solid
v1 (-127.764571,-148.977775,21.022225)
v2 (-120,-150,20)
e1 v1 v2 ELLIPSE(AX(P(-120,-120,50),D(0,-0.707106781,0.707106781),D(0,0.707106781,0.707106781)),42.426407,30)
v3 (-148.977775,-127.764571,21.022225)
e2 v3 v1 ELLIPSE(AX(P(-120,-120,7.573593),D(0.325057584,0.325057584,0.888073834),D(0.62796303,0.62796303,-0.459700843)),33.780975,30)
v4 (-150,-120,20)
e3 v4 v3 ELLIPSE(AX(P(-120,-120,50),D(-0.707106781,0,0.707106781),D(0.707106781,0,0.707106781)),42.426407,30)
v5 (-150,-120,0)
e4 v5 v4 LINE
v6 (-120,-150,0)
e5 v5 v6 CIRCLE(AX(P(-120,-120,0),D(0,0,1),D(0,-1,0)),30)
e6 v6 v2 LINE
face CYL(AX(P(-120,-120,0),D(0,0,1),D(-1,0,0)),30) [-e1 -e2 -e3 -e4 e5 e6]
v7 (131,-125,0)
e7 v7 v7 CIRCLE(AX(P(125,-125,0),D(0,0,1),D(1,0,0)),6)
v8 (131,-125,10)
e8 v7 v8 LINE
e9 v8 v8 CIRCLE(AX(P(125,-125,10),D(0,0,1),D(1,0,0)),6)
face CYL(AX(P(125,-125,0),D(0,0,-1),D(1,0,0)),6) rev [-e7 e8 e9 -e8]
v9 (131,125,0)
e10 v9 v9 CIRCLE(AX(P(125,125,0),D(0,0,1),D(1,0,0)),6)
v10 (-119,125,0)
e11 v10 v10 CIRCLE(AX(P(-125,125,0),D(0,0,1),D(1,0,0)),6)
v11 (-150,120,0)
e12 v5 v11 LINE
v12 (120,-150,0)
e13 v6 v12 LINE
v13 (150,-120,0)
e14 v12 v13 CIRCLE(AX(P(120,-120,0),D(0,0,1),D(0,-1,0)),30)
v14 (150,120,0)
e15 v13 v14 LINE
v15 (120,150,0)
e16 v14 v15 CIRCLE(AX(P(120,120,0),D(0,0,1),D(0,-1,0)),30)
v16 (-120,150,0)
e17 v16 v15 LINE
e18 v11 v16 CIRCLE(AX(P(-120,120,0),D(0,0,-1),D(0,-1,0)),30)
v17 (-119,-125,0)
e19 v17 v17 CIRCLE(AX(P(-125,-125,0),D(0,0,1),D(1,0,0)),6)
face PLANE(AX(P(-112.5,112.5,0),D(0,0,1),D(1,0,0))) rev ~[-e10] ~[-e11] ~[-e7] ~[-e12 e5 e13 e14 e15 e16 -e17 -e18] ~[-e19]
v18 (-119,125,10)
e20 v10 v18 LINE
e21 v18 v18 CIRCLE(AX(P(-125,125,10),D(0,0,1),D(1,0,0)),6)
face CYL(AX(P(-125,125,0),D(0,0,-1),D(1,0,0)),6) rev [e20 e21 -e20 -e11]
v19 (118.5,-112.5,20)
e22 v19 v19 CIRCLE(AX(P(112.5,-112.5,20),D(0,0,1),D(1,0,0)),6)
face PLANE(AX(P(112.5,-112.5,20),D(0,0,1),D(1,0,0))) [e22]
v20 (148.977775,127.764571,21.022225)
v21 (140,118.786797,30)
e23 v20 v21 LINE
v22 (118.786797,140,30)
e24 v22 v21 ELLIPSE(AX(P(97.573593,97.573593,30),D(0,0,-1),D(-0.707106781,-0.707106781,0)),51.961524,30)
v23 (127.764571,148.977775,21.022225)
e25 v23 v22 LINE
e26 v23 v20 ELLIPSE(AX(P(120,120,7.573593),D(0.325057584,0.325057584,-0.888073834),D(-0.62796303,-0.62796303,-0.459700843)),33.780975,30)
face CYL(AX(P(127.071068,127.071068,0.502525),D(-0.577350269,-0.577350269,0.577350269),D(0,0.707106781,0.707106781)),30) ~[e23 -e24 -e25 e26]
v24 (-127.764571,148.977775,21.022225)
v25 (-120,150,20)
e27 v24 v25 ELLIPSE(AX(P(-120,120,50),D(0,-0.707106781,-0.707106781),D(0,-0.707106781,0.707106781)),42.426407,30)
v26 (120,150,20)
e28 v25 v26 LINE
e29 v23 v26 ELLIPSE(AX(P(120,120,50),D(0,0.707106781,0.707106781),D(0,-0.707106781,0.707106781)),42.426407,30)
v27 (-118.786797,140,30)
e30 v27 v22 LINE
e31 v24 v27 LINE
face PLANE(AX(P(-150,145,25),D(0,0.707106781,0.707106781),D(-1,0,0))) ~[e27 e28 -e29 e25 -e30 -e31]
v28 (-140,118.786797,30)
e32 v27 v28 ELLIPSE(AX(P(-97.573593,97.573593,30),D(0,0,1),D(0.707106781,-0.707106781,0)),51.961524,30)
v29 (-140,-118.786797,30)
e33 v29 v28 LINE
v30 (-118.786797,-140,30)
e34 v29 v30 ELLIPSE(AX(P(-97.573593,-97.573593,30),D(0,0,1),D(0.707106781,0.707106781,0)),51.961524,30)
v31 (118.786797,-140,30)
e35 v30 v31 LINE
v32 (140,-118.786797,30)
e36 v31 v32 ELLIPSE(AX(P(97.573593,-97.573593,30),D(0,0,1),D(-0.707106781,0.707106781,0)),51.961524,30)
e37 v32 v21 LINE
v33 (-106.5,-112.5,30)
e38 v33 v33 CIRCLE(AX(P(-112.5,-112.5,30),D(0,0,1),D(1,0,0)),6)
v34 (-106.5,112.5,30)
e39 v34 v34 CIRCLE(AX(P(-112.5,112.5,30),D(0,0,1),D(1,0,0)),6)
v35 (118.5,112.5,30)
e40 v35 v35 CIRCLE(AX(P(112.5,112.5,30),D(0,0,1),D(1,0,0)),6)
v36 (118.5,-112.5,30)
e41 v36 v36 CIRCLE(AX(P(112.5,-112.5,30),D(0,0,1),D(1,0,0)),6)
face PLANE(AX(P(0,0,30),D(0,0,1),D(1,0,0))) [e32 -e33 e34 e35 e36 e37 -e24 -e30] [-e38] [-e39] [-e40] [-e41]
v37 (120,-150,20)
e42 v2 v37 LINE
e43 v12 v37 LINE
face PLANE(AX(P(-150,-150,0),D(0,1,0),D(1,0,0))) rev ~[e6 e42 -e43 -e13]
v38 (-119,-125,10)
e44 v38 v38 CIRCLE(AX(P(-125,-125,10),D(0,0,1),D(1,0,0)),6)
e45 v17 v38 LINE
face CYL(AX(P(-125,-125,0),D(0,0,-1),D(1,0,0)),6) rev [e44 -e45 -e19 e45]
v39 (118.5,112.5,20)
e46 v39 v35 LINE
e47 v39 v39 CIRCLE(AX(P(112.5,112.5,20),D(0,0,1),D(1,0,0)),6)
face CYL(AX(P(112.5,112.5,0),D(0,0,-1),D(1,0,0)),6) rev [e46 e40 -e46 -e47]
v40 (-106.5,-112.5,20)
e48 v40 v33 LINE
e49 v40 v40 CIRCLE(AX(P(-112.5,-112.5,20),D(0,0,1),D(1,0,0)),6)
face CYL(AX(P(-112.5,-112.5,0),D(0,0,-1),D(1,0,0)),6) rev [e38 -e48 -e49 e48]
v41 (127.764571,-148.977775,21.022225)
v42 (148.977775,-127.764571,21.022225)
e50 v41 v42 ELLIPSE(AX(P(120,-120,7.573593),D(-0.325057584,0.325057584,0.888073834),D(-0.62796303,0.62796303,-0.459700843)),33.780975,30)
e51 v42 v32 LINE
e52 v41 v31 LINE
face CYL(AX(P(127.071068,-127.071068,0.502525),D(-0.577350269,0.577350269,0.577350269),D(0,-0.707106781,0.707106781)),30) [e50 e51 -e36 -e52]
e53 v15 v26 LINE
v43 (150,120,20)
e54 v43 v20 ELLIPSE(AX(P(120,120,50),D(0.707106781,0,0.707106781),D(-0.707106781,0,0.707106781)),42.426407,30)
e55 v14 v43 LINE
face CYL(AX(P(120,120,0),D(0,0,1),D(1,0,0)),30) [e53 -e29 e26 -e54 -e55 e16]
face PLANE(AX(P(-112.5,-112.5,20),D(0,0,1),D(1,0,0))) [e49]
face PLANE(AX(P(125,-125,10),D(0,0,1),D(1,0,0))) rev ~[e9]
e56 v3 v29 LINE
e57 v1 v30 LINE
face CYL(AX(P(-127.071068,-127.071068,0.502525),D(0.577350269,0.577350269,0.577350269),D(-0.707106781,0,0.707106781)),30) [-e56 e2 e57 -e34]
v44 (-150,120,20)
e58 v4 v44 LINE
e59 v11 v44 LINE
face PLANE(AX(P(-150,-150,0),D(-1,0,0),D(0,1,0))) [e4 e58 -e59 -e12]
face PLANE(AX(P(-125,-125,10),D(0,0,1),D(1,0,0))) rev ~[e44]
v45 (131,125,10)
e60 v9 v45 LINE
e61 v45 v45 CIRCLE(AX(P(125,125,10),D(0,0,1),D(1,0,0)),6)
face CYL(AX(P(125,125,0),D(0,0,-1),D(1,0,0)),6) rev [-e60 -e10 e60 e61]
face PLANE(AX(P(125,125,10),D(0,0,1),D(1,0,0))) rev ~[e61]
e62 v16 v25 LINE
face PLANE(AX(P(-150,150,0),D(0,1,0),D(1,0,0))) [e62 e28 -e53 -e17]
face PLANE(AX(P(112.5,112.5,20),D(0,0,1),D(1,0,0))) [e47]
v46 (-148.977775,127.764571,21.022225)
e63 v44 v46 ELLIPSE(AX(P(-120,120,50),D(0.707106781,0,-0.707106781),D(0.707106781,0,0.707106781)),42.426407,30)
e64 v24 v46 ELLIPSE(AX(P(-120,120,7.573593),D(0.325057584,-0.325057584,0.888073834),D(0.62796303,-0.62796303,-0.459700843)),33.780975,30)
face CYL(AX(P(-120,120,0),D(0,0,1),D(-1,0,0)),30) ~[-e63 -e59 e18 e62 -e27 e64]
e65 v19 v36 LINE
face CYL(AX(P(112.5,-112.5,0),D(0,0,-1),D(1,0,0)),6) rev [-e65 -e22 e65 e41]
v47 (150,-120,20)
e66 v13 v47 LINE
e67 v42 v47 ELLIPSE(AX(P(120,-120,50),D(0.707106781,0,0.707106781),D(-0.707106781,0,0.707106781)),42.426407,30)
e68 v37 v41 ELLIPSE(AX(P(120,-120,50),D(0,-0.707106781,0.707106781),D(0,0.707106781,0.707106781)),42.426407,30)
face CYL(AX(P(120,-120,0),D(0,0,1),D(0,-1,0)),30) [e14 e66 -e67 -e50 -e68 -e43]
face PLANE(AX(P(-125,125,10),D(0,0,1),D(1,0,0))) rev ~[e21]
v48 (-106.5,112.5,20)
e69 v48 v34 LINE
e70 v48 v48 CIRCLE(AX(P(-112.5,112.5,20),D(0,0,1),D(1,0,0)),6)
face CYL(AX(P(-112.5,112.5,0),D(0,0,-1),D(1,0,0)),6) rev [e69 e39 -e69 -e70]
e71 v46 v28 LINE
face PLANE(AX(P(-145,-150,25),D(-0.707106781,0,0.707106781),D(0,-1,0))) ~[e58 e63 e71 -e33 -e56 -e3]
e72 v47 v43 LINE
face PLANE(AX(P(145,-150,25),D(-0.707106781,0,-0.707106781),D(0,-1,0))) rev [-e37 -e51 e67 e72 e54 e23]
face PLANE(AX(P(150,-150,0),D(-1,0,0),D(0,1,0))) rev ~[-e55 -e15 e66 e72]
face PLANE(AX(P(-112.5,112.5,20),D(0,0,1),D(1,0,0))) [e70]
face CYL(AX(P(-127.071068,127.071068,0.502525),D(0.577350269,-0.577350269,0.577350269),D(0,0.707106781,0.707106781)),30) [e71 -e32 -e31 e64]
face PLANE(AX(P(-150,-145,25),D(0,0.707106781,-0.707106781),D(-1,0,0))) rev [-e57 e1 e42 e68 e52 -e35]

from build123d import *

# Parameters (mm, degrees)
F0_W     = 300
F0_H     = 300
F0_R     = 6
F1_DEPTH = 30
F2_DEPTH = 10
F3_DEPTH = 20
F4_SIZE2 = 10
F4_SIZE  = 10
F5_F1_R  = 30
F5_F2_R  = 30
F5_F3_R  = 30
F5_F4_R  = 30
F5_F5_R  = 30
F5_F6_R  = 30
F5_F7_R  = 30
F5_F8_R  = 30


with BuildPart() as f1:
    # F0 (on Top) → F1 (new body)
    with BuildSketch(Plane.XY):
        Rectangle(F0_W, F0_H)
        with Locations((-125, -125)):
            Circle(F0_R, mode=Mode.SUBTRACT)
        with Locations((-112.5, -112.5)):
            Circle(F0_R, mode=Mode.SUBTRACT)
        with Locations((125, -125)):
            Circle(F0_R, mode=Mode.SUBTRACT)
        with Locations((112.5, -112.5)):
            Circle(F0_R, mode=Mode.SUBTRACT)
        with Locations((-125, 125)):
            Circle(F0_R, mode=Mode.SUBTRACT)
        with Locations((-112.5, 112.5)):
            Circle(F0_R, mode=Mode.SUBTRACT)
        with Locations((112.5, 112.5)):
            Circle(F0_R, mode=Mode.SUBTRACT)
        with Locations((125, 125)):
            Circle(F0_R, mode=Mode.SUBTRACT)
        with Locations((-125, -125)):
            Circle(F0_R)
        with Locations((-125, 125)):
            Circle(F0_R)
        with Locations((125, 125)):
            Circle(F0_R)
        with Locations((125, -125)):
            Circle(F0_R)
    extrude(amount=F1_DEPTH)

    # F0 (on Top) → F2 (cut)
    with BuildSketch(Plane.XY):
        with Locations((-125, -125)):
            Circle(F0_R)
        with Locations((-125, 125)):
            Circle(F0_R)
        with Locations((125, 125)):
            Circle(F0_R)
        with Locations((125, -125)):
            Circle(F0_R)
    extrude(amount=F2_DEPTH, mode=Mode.SUBTRACT)

    # F0 (on Top) → F3 (join)
    with BuildSketch(Plane.XY):
        with Locations((-112.5, 112.5)):
            Circle(F0_R)
        with Locations((-112.5, -112.5)):
            Circle(F0_R)
        with Locations((112.5, 112.5)):
            Circle(F0_R)
        with Locations((112.5, -112.5)):
            Circle(F0_R)
    extrude(amount=F3_DEPTH)

    # F4
    f4_edges = [f1.edges().sort_by_distance(p)[0] for p in [
        (0, -150, 30),
        (-150, 0, 30),
        (150, 0, 30),
        (0, 150, 30),
    ]]
    chamfer(f4_edges, length=F4_SIZE, length2=F4_SIZE2)

    # F5: fillet of radius 30 on 8 edges, made by hand

    # F5_f1
    f5_f1_edges = [f1.edges().sort_by_distance(p)[0] for p in [
        (-150, -150, 10),
    ]]
    fillet(f5_f1_edges, radius=F5_F1_R)

    # F5_f2
    f5_f2_edges = [f1.edges().sort_by_distance(p)[0] for p in [
        (150, -150, 10),
    ]]
    fillet(f5_f2_edges, radius=F5_F2_R)

    # F5_f3
    f5_f3_edges = [f1.edges().sort_by_distance(p)[0] for p in [
        (-150, 150, 10),
    ]]
    fillet(f5_f3_edges, radius=F5_F3_R)

    # F5_f4
    f5_f4_edges = [f1.edges().sort_by_distance(p)[0] for p in [
        (-140.6066017178, -140.6066017178, 29.3933982822),
    ]]
    fillet(f5_f4_edges, radius=F5_F4_R)

    # F5_f5
    f5_f5_edges = [f1.edges().sort_by_distance(p)[0] for p in [
        (140.6066017178, -140.6066017178, 29.3933982822),
    ]]
    fillet(f5_f5_edges, radius=F5_F5_R)

    # F5_f6
    f5_f6_edges = [f1.edges().sort_by_distance(p)[0] for p in [
        (150, 150, 10),
    ]]
    fillet(f5_f6_edges, radius=F5_F6_R)

    # F5_f7
    f5_f7_edges = [f1.edges().sort_by_distance(p)[0] for p in [
        (-140.6066017178, 140.6066017178, 29.3933982822),
    ]]
    fillet(f5_f7_edges, radius=F5_F7_R)

    # F5_f8
    f5_f8_edges = [f1.edges().sort_by_distance(p)[0] for p in [
        (140.6066017178, 140.6066017178, 29.3933982822),
    ]]
    fillet(f5_f8_edges, radius=F5_F8_R)


solid = f1.part
